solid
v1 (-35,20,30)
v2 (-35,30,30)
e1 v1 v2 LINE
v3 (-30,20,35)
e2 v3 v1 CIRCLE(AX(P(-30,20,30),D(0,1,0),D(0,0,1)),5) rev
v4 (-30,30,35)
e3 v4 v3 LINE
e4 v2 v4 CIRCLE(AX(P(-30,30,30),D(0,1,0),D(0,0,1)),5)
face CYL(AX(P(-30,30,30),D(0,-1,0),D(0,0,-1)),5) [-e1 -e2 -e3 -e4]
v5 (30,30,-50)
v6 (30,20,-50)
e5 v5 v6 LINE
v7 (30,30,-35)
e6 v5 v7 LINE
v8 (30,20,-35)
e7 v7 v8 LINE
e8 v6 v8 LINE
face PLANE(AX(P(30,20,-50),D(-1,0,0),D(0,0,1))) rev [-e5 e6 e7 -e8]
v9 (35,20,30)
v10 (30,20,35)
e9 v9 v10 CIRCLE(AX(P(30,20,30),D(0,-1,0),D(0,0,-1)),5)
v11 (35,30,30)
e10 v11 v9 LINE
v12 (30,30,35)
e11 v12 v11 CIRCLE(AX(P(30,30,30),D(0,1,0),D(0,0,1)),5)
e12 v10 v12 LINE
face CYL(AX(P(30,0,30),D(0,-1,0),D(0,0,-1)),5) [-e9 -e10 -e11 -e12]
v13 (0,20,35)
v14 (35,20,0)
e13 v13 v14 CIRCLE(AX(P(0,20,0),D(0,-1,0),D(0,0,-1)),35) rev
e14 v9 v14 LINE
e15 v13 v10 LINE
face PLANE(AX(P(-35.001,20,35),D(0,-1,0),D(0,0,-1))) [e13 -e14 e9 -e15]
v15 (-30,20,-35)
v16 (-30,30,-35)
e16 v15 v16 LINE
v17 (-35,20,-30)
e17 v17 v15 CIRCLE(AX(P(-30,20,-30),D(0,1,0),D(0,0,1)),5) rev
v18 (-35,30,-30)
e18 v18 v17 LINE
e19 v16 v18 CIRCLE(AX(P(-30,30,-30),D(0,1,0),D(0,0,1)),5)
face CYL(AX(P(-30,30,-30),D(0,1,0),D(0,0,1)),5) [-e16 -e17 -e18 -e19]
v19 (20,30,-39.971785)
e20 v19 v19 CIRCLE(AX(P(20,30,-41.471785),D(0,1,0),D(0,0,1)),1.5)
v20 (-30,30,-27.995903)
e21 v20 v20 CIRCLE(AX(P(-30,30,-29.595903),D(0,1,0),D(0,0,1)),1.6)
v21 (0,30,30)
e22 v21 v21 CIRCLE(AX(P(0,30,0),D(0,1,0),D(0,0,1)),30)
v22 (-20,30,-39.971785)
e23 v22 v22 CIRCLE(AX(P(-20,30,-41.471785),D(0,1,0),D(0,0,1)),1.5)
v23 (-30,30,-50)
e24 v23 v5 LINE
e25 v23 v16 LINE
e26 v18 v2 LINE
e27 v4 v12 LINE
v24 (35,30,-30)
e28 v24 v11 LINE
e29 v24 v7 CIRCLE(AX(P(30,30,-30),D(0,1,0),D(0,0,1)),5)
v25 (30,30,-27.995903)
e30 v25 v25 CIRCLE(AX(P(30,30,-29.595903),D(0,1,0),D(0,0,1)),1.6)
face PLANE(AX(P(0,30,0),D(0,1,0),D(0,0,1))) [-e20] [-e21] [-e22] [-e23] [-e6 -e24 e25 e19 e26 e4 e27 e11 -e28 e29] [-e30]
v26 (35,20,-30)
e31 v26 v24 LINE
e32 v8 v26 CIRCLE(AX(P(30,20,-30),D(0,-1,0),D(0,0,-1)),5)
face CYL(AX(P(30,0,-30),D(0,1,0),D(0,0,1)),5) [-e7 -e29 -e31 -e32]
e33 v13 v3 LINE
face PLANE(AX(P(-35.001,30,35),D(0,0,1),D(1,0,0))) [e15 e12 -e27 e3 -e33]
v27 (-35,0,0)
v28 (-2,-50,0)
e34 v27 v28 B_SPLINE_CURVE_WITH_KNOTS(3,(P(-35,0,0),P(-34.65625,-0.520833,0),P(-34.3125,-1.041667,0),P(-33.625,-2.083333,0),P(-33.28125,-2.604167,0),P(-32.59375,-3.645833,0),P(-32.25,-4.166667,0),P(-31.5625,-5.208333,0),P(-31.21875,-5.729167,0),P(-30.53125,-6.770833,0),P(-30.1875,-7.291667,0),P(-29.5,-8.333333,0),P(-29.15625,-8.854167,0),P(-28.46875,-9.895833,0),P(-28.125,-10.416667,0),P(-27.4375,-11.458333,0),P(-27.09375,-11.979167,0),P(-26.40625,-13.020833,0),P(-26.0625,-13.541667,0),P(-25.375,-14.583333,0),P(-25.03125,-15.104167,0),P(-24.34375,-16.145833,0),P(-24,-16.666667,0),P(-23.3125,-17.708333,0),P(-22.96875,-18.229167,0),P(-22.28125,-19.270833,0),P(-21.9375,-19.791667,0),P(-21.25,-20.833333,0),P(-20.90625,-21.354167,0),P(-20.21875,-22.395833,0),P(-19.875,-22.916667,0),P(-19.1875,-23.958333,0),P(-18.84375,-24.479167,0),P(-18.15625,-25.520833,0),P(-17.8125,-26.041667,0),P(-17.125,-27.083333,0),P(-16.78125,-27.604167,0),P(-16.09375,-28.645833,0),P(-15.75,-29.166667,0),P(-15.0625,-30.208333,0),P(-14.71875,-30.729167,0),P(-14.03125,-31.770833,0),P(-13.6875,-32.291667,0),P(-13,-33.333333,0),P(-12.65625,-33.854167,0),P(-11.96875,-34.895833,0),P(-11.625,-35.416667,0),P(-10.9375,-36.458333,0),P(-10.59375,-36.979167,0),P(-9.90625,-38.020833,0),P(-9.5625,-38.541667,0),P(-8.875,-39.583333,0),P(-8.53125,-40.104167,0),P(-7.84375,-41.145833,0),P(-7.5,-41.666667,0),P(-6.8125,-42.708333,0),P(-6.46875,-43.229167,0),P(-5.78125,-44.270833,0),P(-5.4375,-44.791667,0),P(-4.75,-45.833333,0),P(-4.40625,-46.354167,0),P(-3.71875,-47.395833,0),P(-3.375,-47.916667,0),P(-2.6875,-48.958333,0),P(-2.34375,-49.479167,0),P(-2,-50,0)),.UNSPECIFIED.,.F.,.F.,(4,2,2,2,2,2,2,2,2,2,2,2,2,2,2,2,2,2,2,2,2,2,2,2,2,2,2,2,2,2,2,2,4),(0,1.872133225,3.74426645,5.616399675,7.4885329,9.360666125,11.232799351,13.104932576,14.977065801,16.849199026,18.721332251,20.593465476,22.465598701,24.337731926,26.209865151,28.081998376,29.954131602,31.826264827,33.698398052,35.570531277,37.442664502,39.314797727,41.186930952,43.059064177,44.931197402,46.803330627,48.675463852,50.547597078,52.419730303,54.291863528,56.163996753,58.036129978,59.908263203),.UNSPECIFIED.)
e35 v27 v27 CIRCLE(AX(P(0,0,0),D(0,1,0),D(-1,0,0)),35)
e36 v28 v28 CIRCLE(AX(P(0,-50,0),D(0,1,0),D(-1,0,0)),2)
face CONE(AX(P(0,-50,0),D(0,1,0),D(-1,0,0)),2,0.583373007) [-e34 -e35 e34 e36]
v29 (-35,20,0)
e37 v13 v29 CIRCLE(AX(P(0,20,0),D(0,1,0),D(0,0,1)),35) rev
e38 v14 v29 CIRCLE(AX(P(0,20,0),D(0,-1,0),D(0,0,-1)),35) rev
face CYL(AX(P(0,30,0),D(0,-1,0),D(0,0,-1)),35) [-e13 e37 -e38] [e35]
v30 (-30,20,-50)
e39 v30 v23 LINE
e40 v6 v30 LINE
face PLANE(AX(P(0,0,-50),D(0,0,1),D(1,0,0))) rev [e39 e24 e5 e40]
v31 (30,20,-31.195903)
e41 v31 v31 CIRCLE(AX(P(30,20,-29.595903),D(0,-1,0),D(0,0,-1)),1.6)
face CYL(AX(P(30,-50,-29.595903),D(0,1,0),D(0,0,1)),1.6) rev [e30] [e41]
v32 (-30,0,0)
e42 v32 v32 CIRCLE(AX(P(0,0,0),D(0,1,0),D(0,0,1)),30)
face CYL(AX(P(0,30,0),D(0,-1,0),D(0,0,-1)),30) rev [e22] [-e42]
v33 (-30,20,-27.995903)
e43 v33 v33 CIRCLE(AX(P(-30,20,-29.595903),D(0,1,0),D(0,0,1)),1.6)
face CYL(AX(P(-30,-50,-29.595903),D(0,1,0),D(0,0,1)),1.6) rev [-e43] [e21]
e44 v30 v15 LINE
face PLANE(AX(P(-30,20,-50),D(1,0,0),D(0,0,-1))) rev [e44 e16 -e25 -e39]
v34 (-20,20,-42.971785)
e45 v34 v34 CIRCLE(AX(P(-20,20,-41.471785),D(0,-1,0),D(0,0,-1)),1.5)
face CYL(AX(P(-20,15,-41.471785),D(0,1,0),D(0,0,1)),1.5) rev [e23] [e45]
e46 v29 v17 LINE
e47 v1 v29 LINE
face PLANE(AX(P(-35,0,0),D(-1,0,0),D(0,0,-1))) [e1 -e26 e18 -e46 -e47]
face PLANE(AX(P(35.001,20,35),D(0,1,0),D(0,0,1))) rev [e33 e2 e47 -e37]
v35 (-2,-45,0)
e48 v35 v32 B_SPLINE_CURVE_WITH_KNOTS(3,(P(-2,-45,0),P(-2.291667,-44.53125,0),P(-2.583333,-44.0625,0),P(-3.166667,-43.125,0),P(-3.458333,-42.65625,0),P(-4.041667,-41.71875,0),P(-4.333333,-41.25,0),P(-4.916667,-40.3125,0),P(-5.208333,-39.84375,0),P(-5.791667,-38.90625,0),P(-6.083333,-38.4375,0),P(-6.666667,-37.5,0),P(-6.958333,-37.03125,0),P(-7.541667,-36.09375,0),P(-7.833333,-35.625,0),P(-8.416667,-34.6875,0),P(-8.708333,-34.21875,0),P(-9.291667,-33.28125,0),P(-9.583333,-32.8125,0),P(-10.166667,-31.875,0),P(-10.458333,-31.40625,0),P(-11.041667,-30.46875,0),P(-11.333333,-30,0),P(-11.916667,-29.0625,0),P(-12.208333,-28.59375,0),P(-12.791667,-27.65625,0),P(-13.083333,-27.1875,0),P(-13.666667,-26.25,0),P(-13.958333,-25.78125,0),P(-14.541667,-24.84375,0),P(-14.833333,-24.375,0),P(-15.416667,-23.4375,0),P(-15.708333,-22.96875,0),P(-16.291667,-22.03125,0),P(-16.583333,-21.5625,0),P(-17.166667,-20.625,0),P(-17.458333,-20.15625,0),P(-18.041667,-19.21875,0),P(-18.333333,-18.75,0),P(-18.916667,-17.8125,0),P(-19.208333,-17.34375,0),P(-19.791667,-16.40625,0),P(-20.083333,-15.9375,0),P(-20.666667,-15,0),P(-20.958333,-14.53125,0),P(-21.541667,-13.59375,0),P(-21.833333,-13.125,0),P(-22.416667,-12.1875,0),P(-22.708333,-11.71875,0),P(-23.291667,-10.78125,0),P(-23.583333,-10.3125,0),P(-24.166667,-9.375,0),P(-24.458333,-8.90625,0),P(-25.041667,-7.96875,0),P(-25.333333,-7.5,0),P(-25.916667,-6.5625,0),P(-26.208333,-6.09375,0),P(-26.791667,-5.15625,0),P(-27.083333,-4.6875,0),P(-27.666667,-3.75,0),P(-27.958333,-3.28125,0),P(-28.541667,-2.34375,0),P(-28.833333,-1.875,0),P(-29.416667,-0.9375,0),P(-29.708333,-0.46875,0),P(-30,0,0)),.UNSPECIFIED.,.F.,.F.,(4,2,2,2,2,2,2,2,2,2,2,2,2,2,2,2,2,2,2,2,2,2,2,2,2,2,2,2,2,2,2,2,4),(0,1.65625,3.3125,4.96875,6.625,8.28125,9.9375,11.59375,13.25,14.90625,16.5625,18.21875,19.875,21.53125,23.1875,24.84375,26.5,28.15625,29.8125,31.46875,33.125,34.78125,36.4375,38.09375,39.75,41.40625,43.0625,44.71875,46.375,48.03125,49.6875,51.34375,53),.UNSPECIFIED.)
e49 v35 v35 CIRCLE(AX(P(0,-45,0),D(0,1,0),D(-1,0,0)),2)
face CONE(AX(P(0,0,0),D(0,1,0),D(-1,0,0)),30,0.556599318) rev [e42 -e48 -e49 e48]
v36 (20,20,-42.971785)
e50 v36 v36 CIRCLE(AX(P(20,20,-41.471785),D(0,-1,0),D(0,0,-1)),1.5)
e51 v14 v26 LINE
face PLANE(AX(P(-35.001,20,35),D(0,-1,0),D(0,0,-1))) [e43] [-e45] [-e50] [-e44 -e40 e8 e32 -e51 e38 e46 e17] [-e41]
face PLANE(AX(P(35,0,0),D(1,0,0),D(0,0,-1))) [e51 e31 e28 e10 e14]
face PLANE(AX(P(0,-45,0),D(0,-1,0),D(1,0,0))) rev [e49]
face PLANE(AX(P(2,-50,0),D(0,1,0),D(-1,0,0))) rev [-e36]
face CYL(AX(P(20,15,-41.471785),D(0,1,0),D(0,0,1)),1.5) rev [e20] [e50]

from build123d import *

# Parameters (mm, degrees)
SKETCH1_R                = 35
SKETCH1_R_2              = 30
BOSS_EXTRUDE1_DEPTH      = 30
BOSS_EXTRUDE2_REACH      = 94.871
BOSS_EXTRUDE2_END_RADIUS = 35
SKETCH4_W                = 70
SKETCH4_H                = 10
SKETCH5_R                = 1.6
CUT_EXTRUDE1_DEPTH       = 95.074438611
FILLET1_R                = 5
SKETCH7_W                = 60
SKETCH7_H                = 10
BOSS_EXTRUDE3_DEPTH      = 15
SKETCH6_R                = 1.5
CUT_EXTRUDE2_DEPTH       = 15


# Read off the part's stored shape, not the designer's step: Split2
with BuildPart() as part:
    # Sketch1 → Boss-Extrude1 (new body)
    with BuildSketch(Plane(origin=(0, 0, 0), x_dir=(1, 0, 0), z_dir=(0, 1, 0))):
        with Locations(Location((0, 0, 0), (0, 0, 270))):
            Circle(SKETCH1_R)
        with Locations(Location((0, 0, 0), (0, 0, 270))):
            Circle(SKETCH1_R_2, mode=Mode.SUBTRACT)
    extrude(amount=BOSS_EXTRUDE1_DEPTH)

    # Sketch3 → Revolve1 (revolve)
    with BuildSketch(Plane.XY, mode=Mode.PRIVATE) as revolve1_sk:
        Polygon((2, -50), (35, 0), (30, 0), (2, -45), (0, -45), (0, -50), align=None)
    revolve(revolve1_sk.sketch.rotate(Axis((0, 0, 0), (0, -1, 0)), 180), axis=Axis((0, 0, 0), (0, -1, 0)))


with BuildPart() as body_2:
    # Split1: the piece on the far side of the plane
    add(part.part)
    split(bisect_by=Plane(origin=(0, 0, 0), x_dir=(0, 0, 1), z_dir=(1, 0, 0)), keep=Keep.BOTTOM)


with BuildPart() as part_1:
    add(part.part)

    # Split1
    split(bisect_by=Plane(origin=(0, 0, 0), x_dir=(0, 0, 1), z_dir=(1, 0, 0)), keep=Keep.TOP)

    add(body_2.part)  # Boss-Extrude2 merges body 2
    # Boss-Extrude2: up to this cylinder (the profile starts outside it)
    boss_extrude2_end = Plane(origin=(0, 25, 0), z_dir=(0, -1, 0)) * Cylinder(BOSS_EXTRUDE2_END_RADIUS, 260.742, mode=Mode.PRIVATE)
    # Sketch4 → Boss-Extrude2 (add, up to the surface)
    with BuildSketch(Plane(origin=(35, 0, 0), x_dir=(0, 0, -1), z_dir=(1, 0, 0)), mode=Mode.PRIVATE) as boss_extrude2_sk1:
        with Locations((0, 25)):
            Rectangle(SKETCH4_W, SKETCH4_H)
    boss_extrude2_tool1 = extrude(boss_extrude2_sk1.sketch, amount=-BOSS_EXTRUDE2_REACH, mode=Mode.PRIVATE) - boss_extrude2_end
    boss_extrude2 = boss_extrude2_tool1.solids().sort_by_distance((35, 25, 0))[0] + boss_extrude2_tool1.solids().sort_by_distance((35, 25, 0))[1]
    add(boss_extrude2)

    # Mirror1: Boss-Extrude2 across plane
    add(boss_extrude2.mirror(Plane(origin=(0, 0, 0), x_dir=(0, 0, 1), z_dir=(1, 0, 0))))

    # Sketch5 → Cut-Extrude1 (cut, through all)
    with BuildSketch(Plane(origin=(0, 30, 0), x_dir=(1, 0, 0), z_dir=(0, 1, 0))):
        with Locations(Location((-30, 29.59590276, 0), (0, 0, 270))):
            Circle(SKETCH5_R)
        with Locations(Location((30, 29.59590276, 0), (0, 0, 270))):
            Circle(SKETCH5_R)
    extrude(amount=-CUT_EXTRUDE1_DEPTH, mode=Mode.SUBTRACT)

    # Fillet1
    fillet1_edges = [part_1.edges().sort_by_distance(p)[0] for p in [
        (35, 25, -35),
        (35, 25, 35),
        (-35, 25, 35),
        (-35, 25, -35),
    ]]
    fillet(fillet1_edges, radius=FILLET1_R)


with BuildPart() as body_2_2:
    # Split2: the piece on the far side of the plane
    add(part_1.part)
    split(bisect_by=Plane.YZ, keep=Keep.BOTTOM)


with BuildPart() as part_2:
    add(part_1.part)

    # Split2
    split(bisect_by=Plane.YZ, keep=Keep.TOP)

    add(body_2_2.part)  # Boss-Extrude3 merges body 2 2
    # Sketch7 → Boss-Extrude3 (add)
    with BuildSketch(Plane(origin=(0, 0, -35), x_dir=(-1, 0, 0), z_dir=(0, 0, -1))):
        with Locations((0, 25)):
            Rectangle(SKETCH7_W, SKETCH7_H)
    extrude(amount=BOSS_EXTRUDE3_DEPTH)

    # Sketch6 → Cut-Extrude2 (cut)
    with BuildSketch(Plane(origin=(0, 30, 0), x_dir=(1, 0, 0), z_dir=(0, 1, 0))):
        with Locations(Location((-20, 41.471784691, 0), (0, 0, 270))):
            Circle(SKETCH6_R)
        with Locations(Location((20, 41.471784691, 0), (0, 0, 270))):
            Circle(SKETCH6_R)
    extrude(amount=-CUT_EXTRUDE2_DEPTH, mode=Mode.SUBTRACT)


solid = part_2.part
